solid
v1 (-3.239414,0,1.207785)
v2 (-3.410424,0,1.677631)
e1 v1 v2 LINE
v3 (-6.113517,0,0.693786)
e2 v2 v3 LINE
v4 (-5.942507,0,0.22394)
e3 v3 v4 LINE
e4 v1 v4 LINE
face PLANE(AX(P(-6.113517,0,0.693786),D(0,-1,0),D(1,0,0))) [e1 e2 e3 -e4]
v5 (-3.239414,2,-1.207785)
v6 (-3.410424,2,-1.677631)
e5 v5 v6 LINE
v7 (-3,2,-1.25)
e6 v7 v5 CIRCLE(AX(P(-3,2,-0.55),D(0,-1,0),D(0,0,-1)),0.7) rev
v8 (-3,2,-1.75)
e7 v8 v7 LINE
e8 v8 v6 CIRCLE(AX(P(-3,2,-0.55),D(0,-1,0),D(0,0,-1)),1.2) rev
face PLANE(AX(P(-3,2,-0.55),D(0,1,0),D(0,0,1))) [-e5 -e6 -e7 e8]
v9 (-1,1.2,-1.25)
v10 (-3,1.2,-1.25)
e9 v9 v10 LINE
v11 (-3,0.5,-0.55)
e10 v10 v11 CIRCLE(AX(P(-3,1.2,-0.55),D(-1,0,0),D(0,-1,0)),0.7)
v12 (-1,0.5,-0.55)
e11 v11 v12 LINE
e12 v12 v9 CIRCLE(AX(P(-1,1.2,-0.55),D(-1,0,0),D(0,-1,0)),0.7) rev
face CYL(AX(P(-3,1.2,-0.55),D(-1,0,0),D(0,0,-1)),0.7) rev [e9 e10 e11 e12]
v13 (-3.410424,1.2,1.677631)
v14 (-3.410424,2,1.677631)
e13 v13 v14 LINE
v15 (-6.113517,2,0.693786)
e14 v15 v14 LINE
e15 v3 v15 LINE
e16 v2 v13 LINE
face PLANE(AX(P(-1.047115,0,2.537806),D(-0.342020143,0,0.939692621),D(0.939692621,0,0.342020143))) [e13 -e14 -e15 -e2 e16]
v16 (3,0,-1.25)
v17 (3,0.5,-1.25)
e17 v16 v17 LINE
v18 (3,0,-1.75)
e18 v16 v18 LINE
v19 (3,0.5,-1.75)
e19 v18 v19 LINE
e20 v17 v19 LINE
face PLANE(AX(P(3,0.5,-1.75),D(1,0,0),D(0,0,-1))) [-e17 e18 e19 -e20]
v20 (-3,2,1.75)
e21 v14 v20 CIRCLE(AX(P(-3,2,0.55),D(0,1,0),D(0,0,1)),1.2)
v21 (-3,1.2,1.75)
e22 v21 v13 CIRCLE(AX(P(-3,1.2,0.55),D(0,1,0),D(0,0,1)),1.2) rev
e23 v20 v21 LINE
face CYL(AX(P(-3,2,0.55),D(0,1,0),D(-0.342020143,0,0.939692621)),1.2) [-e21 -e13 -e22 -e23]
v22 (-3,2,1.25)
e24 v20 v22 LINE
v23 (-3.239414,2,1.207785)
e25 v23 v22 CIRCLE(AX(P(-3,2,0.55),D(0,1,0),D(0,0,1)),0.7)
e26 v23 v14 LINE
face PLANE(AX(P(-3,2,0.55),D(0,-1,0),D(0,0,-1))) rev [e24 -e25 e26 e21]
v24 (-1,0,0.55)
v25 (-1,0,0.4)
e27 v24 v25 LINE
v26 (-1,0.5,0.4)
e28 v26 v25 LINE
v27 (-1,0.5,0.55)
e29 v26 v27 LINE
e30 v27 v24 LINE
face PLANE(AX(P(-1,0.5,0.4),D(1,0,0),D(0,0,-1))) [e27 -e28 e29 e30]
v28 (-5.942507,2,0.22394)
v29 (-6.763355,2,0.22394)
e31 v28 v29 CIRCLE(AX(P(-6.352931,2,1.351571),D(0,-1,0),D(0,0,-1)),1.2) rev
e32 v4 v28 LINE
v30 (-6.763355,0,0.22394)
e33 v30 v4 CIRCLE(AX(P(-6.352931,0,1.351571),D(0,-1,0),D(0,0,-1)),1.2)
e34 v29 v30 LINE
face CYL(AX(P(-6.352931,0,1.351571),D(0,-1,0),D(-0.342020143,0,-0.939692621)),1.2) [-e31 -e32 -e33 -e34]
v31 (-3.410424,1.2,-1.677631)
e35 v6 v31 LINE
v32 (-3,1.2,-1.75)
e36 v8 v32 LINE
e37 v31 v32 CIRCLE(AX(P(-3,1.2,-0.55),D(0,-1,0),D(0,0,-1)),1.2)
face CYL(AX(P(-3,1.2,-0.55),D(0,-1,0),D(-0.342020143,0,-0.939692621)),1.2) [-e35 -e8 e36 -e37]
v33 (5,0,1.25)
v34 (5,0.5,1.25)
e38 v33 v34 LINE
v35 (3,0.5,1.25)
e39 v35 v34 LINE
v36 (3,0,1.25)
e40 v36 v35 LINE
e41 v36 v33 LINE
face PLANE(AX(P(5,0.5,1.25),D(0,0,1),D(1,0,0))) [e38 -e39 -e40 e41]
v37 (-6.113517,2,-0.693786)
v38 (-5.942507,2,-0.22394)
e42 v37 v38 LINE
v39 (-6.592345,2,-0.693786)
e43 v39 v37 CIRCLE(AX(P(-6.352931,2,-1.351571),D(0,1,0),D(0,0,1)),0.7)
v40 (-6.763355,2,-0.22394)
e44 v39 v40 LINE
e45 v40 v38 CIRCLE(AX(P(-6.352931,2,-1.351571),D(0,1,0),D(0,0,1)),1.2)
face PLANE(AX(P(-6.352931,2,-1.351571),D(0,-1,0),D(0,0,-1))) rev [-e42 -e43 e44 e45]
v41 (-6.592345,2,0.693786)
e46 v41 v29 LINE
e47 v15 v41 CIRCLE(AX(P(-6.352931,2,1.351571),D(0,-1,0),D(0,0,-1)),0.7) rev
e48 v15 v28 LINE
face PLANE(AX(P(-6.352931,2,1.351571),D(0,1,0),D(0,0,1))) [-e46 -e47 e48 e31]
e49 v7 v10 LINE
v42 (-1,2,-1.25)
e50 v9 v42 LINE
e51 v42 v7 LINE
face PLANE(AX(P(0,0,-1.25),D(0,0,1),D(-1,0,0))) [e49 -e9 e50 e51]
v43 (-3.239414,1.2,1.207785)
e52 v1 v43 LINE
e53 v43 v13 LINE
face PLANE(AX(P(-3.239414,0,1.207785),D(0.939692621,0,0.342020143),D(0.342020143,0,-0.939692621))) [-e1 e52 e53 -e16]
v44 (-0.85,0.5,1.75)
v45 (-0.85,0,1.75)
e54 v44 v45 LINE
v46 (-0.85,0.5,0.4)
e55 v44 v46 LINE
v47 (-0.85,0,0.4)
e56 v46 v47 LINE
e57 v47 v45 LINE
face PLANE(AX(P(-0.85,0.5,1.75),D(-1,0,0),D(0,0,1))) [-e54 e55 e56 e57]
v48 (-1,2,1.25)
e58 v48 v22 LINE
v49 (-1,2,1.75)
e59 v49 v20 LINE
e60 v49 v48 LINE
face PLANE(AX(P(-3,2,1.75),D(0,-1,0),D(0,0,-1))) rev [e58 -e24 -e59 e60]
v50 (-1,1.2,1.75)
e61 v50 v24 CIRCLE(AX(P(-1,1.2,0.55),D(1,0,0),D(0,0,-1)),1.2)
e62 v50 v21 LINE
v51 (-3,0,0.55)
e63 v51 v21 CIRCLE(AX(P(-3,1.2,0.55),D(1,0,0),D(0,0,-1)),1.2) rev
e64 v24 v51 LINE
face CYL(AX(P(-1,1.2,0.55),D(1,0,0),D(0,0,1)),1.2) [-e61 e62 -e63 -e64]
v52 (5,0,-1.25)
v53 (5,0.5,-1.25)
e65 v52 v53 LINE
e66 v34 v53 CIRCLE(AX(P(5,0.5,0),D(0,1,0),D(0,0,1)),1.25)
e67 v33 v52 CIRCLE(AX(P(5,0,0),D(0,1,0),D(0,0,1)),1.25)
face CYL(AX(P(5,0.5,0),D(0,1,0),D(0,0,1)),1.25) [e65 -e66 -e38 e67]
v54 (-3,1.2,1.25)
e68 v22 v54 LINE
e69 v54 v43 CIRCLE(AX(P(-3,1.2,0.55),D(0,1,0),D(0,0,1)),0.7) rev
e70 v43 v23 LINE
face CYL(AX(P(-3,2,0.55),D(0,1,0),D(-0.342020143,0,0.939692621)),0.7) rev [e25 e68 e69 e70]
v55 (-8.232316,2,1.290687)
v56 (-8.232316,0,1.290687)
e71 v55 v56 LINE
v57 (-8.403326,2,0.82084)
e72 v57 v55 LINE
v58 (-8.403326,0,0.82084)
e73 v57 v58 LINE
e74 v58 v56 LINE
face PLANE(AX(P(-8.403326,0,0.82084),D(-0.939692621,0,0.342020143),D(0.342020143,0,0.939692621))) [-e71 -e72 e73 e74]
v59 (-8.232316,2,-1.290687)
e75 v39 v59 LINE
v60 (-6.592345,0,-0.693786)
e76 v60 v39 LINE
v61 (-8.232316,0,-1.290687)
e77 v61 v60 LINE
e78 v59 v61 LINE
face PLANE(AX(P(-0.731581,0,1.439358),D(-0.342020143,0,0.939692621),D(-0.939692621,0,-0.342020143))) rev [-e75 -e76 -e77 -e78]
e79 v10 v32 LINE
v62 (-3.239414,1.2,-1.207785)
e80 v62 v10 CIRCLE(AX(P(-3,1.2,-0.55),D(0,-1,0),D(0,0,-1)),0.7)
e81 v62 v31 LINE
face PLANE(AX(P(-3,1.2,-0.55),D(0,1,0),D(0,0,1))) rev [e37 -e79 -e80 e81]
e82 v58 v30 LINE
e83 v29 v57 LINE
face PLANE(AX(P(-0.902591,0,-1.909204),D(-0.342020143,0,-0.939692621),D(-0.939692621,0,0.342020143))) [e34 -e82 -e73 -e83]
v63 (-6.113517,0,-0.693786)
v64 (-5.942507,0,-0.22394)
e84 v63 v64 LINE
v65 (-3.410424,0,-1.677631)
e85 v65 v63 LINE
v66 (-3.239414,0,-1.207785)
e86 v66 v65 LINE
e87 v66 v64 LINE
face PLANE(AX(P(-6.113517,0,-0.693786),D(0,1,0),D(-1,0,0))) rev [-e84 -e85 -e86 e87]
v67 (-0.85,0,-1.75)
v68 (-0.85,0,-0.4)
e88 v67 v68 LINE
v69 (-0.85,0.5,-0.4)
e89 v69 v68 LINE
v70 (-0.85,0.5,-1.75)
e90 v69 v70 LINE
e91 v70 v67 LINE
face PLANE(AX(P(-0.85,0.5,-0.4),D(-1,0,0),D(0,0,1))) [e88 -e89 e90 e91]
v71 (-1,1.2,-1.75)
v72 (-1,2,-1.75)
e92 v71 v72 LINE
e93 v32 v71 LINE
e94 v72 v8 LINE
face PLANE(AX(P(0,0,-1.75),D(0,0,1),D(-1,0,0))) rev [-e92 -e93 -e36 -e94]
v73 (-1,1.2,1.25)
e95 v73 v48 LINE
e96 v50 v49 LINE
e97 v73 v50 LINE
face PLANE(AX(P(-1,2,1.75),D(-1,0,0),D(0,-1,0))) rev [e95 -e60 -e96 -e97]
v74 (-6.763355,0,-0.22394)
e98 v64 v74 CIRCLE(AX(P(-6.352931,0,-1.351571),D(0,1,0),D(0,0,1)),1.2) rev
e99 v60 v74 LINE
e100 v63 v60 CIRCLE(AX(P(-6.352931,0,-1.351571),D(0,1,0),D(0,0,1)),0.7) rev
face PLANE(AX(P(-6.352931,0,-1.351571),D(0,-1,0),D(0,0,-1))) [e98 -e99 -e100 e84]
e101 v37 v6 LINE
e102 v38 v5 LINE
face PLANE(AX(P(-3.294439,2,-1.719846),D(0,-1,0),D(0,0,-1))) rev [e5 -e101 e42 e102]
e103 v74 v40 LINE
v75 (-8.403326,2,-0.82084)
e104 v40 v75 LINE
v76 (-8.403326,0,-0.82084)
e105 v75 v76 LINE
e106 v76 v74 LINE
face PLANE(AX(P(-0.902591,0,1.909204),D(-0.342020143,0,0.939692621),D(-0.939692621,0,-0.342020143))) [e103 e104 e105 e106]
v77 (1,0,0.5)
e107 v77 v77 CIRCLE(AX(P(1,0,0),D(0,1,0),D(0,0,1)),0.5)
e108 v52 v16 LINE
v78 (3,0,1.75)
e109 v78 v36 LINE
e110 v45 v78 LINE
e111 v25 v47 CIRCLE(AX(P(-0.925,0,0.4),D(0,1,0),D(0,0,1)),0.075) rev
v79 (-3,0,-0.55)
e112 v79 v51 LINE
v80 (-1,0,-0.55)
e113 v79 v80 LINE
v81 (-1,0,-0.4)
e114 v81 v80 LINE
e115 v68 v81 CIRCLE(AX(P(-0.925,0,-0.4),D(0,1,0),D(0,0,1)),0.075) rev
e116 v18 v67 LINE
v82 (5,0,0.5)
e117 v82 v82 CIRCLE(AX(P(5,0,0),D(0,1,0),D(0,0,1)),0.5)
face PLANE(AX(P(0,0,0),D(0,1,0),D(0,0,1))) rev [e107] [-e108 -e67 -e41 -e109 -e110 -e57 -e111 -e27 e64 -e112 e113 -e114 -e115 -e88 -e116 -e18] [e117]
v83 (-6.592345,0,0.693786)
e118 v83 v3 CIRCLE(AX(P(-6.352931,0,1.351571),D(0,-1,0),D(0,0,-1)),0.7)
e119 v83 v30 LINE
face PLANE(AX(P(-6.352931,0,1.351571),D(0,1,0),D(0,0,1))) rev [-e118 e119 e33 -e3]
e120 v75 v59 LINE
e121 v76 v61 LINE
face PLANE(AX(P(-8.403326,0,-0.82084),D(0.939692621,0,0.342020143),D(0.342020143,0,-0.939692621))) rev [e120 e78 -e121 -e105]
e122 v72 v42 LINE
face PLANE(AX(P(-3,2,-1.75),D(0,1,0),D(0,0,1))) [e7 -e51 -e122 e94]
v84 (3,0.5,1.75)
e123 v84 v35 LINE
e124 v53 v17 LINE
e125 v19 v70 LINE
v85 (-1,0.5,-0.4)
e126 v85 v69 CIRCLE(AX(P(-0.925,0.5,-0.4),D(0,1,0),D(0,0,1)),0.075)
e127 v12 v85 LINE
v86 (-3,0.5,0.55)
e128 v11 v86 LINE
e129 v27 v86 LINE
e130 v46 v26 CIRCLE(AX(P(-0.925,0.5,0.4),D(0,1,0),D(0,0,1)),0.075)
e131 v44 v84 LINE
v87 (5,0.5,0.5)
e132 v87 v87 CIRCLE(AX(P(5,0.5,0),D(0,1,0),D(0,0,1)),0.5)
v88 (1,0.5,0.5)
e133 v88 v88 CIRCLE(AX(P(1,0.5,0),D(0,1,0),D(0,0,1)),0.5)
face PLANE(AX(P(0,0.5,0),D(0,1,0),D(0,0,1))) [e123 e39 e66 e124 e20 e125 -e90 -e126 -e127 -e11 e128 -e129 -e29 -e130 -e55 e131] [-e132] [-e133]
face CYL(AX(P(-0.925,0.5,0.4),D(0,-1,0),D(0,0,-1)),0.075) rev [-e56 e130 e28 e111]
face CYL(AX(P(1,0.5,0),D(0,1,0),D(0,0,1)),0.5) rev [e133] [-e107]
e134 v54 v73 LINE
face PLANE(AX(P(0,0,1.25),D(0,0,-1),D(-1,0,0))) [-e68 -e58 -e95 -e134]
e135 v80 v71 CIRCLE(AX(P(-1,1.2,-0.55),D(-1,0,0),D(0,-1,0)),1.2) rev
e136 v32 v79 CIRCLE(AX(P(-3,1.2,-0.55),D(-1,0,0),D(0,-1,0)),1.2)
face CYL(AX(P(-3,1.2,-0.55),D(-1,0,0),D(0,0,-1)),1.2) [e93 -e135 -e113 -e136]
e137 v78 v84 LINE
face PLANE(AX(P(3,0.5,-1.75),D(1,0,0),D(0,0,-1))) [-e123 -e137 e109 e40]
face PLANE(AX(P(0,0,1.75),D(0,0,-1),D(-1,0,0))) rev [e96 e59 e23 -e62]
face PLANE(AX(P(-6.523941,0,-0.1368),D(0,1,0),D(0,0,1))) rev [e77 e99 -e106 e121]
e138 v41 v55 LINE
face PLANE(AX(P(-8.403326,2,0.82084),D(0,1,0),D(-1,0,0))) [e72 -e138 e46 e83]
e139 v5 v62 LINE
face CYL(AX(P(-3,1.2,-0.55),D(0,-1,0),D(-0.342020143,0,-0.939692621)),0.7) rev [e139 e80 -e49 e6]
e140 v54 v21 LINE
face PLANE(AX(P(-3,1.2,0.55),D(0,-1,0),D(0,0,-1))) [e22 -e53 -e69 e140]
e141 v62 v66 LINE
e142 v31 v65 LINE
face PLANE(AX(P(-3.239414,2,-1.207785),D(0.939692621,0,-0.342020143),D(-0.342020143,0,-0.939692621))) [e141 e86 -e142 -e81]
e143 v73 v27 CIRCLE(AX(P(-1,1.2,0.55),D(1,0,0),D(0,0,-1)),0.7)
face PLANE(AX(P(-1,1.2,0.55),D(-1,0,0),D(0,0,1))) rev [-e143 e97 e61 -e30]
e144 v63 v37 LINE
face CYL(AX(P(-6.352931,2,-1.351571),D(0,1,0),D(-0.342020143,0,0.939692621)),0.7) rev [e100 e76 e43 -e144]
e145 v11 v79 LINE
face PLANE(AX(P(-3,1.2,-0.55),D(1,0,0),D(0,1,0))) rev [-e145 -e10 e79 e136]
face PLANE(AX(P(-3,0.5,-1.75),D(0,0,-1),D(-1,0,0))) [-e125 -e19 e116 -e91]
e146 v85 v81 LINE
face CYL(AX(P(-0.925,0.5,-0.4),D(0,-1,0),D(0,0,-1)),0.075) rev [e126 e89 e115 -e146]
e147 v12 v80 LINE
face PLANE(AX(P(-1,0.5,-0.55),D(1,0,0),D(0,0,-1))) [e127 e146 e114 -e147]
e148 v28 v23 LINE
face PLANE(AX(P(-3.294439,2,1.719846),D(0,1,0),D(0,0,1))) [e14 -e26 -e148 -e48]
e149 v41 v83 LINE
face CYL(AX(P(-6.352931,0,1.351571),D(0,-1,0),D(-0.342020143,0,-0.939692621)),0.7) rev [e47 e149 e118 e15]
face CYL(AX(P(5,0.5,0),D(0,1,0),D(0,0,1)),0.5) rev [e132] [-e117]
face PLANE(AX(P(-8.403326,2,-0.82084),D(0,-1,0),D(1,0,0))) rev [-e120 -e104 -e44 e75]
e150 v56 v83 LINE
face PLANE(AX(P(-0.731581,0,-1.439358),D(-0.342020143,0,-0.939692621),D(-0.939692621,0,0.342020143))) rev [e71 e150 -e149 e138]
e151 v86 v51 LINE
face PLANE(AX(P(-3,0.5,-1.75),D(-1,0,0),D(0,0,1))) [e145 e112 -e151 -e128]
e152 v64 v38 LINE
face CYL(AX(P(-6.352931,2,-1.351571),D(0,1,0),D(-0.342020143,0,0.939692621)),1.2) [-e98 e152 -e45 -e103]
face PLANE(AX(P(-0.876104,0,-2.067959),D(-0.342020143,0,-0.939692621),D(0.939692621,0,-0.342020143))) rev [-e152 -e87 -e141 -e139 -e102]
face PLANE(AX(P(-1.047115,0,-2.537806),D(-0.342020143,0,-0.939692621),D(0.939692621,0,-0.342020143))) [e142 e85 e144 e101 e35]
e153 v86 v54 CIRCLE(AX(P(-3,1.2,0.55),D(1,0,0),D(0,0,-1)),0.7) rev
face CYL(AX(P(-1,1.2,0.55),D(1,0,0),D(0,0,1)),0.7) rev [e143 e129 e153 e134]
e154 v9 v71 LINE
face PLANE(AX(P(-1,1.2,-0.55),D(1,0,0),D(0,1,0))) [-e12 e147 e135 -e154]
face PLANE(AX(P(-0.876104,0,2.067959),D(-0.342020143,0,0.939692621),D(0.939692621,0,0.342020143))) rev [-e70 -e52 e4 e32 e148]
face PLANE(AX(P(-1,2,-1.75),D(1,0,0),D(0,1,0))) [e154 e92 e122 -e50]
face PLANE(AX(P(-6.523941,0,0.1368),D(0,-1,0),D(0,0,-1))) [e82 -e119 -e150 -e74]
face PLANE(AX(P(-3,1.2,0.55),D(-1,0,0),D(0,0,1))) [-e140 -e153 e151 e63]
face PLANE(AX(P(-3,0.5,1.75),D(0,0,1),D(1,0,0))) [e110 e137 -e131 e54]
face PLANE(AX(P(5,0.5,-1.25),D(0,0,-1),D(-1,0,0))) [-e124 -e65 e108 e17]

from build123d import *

# Parameters (mm, degrees)
SKETCH1_W                      = 6
SKETCH1_H                      = 3.5
BASE_DEPTH                     = 0.5
TAB_DEPTH                      = 0.5
SKETCH3_R                      = 0.5
SOLDERING_HOLE_DEPTH           = 7.509608283
SKETCH4_R                      = 0.5
RIVET_HOLE_DEPTH               = 7.509608283
FIRST_START                    = -3
FIRST_SIDE_TAB_DEPTH           = 2.15
FIRST_SIDE_TAB_2_DEPTH         = 2
FIRST_START_2                  = -1
FIRST_SIDE_TAB_3_DEPTH         = 2.2
SECOND_ANGLED_SIDE_TAB_DEPTH   = 2
SECOND_START                   = 1.2
SECOND_ANGLED_SIDE_TAB_2_DEPTH = 0.8
THIRD_ANGLED_SIDE_TAB_DEPTH    = 2
MIRROR1_DEPTH                  = 0.5
MIRROR1_2_OUTLINE_W            = 2
MIRROR1_2_OUTLINE_H            = 0.5
MIRROR1_2_DEPTH                = 0.04719
MIRROR1_3_DEPTH                = 2
MIRROR1_START                  = 1.2
MIRROR1_4_DEPTH                = 0.8
MIRROR1_START_2                = -3
MIRROR1_5_DEPTH                = 2
MIRROR1_6_DEPTH                = 2


with BuildPart() as part:
    # Sketch1 → BASE (new body)
    with BuildSketch(Plane(origin=(0, 0, 0), x_dir=(1, 0, 0), z_dir=(0, 1, 0))):
        Rectangle(SKETCH1_W, SKETCH1_H)
    extrude(amount=BASE_DEPTH)

    # Sketch2 → TAB (add)
    with BuildSketch(Plane(origin=(0, 0, 0), x_dir=(1, 0, 0), z_dir=(0, 1, 0))):
        with BuildLine():
            Line((5, -1.25), (3, -1.25))
            ThreePointArc((3, -1.25), (1.75, 0), (3, 1.25))
            Line((3, 1.25), (5, 1.25))
            ThreePointArc((5, 1.25), (6.25, 0), (5, -1.25))
        make_face()
    extrude(amount=TAB_DEPTH)

    # Sketch3 → SOLDERING HOLE (cut, through all)
    with BuildSketch(Plane(origin=(0, 0.5, 0), x_dir=(1, 0, 0), z_dir=(0, 1, 0))):
        with Locations(Location((5, 0, 0), (0, 0, 270))):
            Circle(SKETCH3_R)
    extrude(amount=-SOLDERING_HOLE_DEPTH, mode=Mode.SUBTRACT)

    # Sketch4 → RIVET HOLE (cut, through all)
    with BuildSketch(Plane(origin=(0, 0.5, 0), x_dir=(1, 0, 0), z_dir=(0, 1, 0))):
        with Locations(Location((1, 0, 0), (0, 0, 270))):
            Circle(SKETCH4_R)
    extrude(amount=-RIVET_HOLE_DEPTH, mode=Mode.SUBTRACT)

    # FIRST SIDE TAB: read off the stored shape, not the designer's step
    # FIRST SIDE TAB outline → FIRST SIDE TAB (cut)
    with BuildSketch(Plane.YZ.offset(FIRST_START)):
        with BuildLine():
            ThreePointArc((0, 0.55), (0.132292175, 1.097722557), (0.5, 1.524679434))
            Line((0.5, 1.524679434), (0.5, 1.75))
            Line((0.5, 1.75), (0, 1.75))
            Line((0, 1.75), (0, 0.55))
        make_face()
    extrude(amount=FIRST_SIDE_TAB_DEPTH, mode=Mode.SUBTRACT)

    # FIRST SIDE TAB 2 outline → FIRST SIDE TAB 2 (add)
    with BuildSketch(Plane.YZ.offset(FIRST_START)):
        with BuildLine():
            Line((2, 1.75), (1.2, 1.75))
            ThreePointArc((1.2, 1.75), (0.832314891, 1.692281778), (0.5, 1.524679434))
            Line((0.5, 1.524679434), (0.5, 0.55))
            ThreePointArc((0.5, 0.55), (0.705025253, 1.044974747), (1.2, 1.25))
            Line((1.2, 1.25), (2, 1.25))
            Line((2, 1.25), (2, 1.75))
        make_face()
    extrude(amount=FIRST_SIDE_TAB_2_DEPTH)

    # FIRST SIDE TAB 3 outline → FIRST SIDE TAB 3 (cut)
    with BuildSketch(Plane(origin=(0, 0, 0), x_dir=(1, 0, 0), z_dir=(0, 1, 0)).offset(FIRST_START_2)):
        with BuildLine():
            Line((-0.85, -3), (-0.85, -0.4))
            ThreePointArc((-0.85, -0.4), (-0.925, -0.325), (-1, -0.4))
            Line((-1, -0.4), (-1, -3))
            Line((-1, -3), (-0.85, -3))
        make_face()
    extrude(amount=FIRST_SIDE_TAB_3_DEPTH, mode=Mode.SUBTRACT)



with BuildPart() as body_2:
    # SECOND ANGLED SIDE TAB: read off the stored shape, not the designer's step
    # SECOND ANGLED SIDE TAB outline → SECOND ANGLED SIDE TAB (new body)
    with BuildSketch(Plane(origin=(0, 0, 0), x_dir=(1, 0, 0), z_dir=(0, 1, 0))):
        Polygon((-6.113516821, -0.69378588), (-3.410424172, -1.677631145), (-3.2394141, -1.207784835), (-5.942506749, -0.22393957), align=None)
    extrude(amount=SECOND_ANGLED_SIDE_TAB_DEPTH)


with BuildPart() as part_1:
    add(part.part)

    add(body_2.part)  # SECOND ANGLED SIDE TAB 2 merges body 2
    # SECOND ANGLED SIDE TAB 2 outline → SECOND ANGLED SIDE TAB 2 (add)
    with BuildSketch(Plane(origin=(0, 0, 0), x_dir=(1, 0, 0), z_dir=(0, 1, 0)).offset(SECOND_START)):
        with BuildLine():
            Line((-3.2394141, -1.207784835), (-3.410424172, -1.677631145))
            ThreePointArc((-3.410424172, -1.677631145), (-3.208377813, -1.731769304), (-3, -1.75))
            Line((-3, -1.75), (-3, -1.25))
            ThreePointArc((-3, -1.25), (-3.121553724, -1.239365427), (-3.2394141, -1.207784835))
        make_face()
    extrude(amount=SECOND_ANGLED_SIDE_TAB_2_DEPTH)

    # THIRD ANGLED SIDE TAB: sheet metal written as solids
    # THIRD ANGLED SIDE TAB section (on a plane across the edge) → THIRD ANGLED SIDE TAB (add)
    with BuildSketch(Plane(origin=(-6.352930921, 2, 0.606646274), x_dir=(0.3420201433256691, 0, 0.9396926207859083), z_dir=(0, -1, 0))):
        with BuildLine():
            Line((-0.5, 0.254779164), (-0.5, 2))
            Line((-0.5, 2), (0, 2))
            Line((0, 2), (0, 0.254779164))
            ThreePointArc((0, 0.254779164), (0.042215165, 0.015365064), (0.16376889, -0.195172163))
            Line((0.16376889, -0.195172163), (-0.219253332, -0.516565968))
            ThreePointArc((-0.219253332, -0.516565968), (-0.427631145, -0.155645008), (-0.5, 0.254779164))
        make_face()
    extrude(amount=THIRD_ANGLED_SIDE_TAB_DEPTH)

    # Mirror1: read off the stored shape, not the designer's step
    # Mirror1 outline → Mirror1 (cut)
    with BuildSketch(Plane(origin=(0, 0, 0), x_dir=(1, 0, 0), z_dir=(0, 1, 0))):
        with BuildLine():
            Line((-0.85, 1.75), (-1, 1.75))
            Line((-1, 1.75), (-1, 0.4))
            ThreePointArc((-1, 0.4), (-0.925, 0.325), (-0.85, 0.4))
            Line((-0.85, 0.4), (-0.85, 1.75))
        make_face()
    extrude(amount=MIRROR1_DEPTH, mode=Mode.SUBTRACT)

    # Mirror1 2 outline → Mirror1 2 (cut)
    with BuildSketch(Plane(origin=(0, 0, 0), x_dir=(1, 0, 0), z_dir=(0, 1, 0))):
        with Locations((-2, 1.5)):
            Rectangle(MIRROR1_2_OUTLINE_W, MIRROR1_2_OUTLINE_H)
    extrude(amount=MIRROR1_2_DEPTH, mode=Mode.SUBTRACT)

    # Mirror1 5 outline → Mirror1 5 (cut)
    with BuildSketch(Plane.YZ.offset(MIRROR1_START_2)):
        with BuildLine():
            Line((0.5, -1.75), (0.5, -1.524679434))
            ThreePointArc((0.5, -1.524679434), (0.132292175, -1.097722557), (0, -0.55))
            Line((0, -0.55), (0, -1.25))
            Line((0, -1.25), (0.04719, -1.25))
            Line((0.04719, -1.25), (0.04719, -1.75))
            Line((0.04719, -1.75), (0.5, -1.75))
        make_face()
    extrude(amount=MIRROR1_5_DEPTH, mode=Mode.SUBTRACT)



with BuildPart() as body_2_2:
    # Mirror1 3 outline → Mirror1 3 (new body)
    with BuildSketch(Plane(origin=(0, 0, 0), x_dir=(1, 0, 0), z_dir=(0, 1, 0))):
        with BuildLine():
            Line((-3.2394141, 1.207784835), (-3.410424172, 1.677631145))
            Line((-3.410424172, 1.677631145), (-6.113516821, 0.69378588))
            ThreePointArc((-6.113516821, 0.69378588), (-6.352930921, 0.651570715), (-6.592345021, 0.69378588))
            Line((-6.592345021, 0.69378588), (-8.232316162, 1.290686561))
            Line((-8.232316162, 1.290686561), (-8.403326234, 0.82084025))
            Line((-8.403326234, 0.82084025), (-6.763355093, 0.22393957))
            ThreePointArc((-6.763355093, 0.22393957), (-6.352930921, 0.151570715), (-5.942506749, 0.22393957))
            Line((-5.942506749, 0.22393957), (-3.2394141, 1.207784835))
        make_face()
    extrude(amount=MIRROR1_3_DEPTH)

    # Mirror1 4 outline → Mirror1 4 (add)
    with BuildSketch(Plane(origin=(0, 0, 0), x_dir=(1, 0, 0), z_dir=(0, 1, 0)).offset(MIRROR1_START)):
        with BuildLine():
            Line((-1, 1.75), (-3, 1.75))
            ThreePointArc((-3, 1.75), (-3.208377813, 1.731769304), (-3.410424172, 1.677631145))
            Line((-3.410424172, 1.677631145), (-3.2394141, 1.207784835))
            ThreePointArc((-3.2394141, 1.207784835), (-3.121553724, 1.239365427), (-3, 1.25))
            Line((-3, 1.25), (-1, 1.25))
            Line((-1, 1.25), (-1, 1.75))
        make_face()
    extrude(amount=MIRROR1_4_DEPTH)


with BuildPart() as part_2:
    add(part_1.part)

    add(body_2_2.part)  # Mirror1 6 merges body 2 2
    # Mirror1 6 outline → Mirror1 6 (add)
    with BuildSketch(Plane.YZ.offset(MIRROR1_START_2)):
        with BuildLine():
            ThreePointArc((0.5, -1.524679434), (0.832314891, -1.692281778), (1.2, -1.75))
            Line((1.2, -1.75), (1.2, -1.25))
            ThreePointArc((1.2, -1.25), (0.705025253, -1.044974747), (0.5, -0.55))
            Line((0.5, -0.55), (0.5, -1.524679434))
        make_face()
    extrude(amount=MIRROR1_6_DEPTH)


solid = part_2.part
